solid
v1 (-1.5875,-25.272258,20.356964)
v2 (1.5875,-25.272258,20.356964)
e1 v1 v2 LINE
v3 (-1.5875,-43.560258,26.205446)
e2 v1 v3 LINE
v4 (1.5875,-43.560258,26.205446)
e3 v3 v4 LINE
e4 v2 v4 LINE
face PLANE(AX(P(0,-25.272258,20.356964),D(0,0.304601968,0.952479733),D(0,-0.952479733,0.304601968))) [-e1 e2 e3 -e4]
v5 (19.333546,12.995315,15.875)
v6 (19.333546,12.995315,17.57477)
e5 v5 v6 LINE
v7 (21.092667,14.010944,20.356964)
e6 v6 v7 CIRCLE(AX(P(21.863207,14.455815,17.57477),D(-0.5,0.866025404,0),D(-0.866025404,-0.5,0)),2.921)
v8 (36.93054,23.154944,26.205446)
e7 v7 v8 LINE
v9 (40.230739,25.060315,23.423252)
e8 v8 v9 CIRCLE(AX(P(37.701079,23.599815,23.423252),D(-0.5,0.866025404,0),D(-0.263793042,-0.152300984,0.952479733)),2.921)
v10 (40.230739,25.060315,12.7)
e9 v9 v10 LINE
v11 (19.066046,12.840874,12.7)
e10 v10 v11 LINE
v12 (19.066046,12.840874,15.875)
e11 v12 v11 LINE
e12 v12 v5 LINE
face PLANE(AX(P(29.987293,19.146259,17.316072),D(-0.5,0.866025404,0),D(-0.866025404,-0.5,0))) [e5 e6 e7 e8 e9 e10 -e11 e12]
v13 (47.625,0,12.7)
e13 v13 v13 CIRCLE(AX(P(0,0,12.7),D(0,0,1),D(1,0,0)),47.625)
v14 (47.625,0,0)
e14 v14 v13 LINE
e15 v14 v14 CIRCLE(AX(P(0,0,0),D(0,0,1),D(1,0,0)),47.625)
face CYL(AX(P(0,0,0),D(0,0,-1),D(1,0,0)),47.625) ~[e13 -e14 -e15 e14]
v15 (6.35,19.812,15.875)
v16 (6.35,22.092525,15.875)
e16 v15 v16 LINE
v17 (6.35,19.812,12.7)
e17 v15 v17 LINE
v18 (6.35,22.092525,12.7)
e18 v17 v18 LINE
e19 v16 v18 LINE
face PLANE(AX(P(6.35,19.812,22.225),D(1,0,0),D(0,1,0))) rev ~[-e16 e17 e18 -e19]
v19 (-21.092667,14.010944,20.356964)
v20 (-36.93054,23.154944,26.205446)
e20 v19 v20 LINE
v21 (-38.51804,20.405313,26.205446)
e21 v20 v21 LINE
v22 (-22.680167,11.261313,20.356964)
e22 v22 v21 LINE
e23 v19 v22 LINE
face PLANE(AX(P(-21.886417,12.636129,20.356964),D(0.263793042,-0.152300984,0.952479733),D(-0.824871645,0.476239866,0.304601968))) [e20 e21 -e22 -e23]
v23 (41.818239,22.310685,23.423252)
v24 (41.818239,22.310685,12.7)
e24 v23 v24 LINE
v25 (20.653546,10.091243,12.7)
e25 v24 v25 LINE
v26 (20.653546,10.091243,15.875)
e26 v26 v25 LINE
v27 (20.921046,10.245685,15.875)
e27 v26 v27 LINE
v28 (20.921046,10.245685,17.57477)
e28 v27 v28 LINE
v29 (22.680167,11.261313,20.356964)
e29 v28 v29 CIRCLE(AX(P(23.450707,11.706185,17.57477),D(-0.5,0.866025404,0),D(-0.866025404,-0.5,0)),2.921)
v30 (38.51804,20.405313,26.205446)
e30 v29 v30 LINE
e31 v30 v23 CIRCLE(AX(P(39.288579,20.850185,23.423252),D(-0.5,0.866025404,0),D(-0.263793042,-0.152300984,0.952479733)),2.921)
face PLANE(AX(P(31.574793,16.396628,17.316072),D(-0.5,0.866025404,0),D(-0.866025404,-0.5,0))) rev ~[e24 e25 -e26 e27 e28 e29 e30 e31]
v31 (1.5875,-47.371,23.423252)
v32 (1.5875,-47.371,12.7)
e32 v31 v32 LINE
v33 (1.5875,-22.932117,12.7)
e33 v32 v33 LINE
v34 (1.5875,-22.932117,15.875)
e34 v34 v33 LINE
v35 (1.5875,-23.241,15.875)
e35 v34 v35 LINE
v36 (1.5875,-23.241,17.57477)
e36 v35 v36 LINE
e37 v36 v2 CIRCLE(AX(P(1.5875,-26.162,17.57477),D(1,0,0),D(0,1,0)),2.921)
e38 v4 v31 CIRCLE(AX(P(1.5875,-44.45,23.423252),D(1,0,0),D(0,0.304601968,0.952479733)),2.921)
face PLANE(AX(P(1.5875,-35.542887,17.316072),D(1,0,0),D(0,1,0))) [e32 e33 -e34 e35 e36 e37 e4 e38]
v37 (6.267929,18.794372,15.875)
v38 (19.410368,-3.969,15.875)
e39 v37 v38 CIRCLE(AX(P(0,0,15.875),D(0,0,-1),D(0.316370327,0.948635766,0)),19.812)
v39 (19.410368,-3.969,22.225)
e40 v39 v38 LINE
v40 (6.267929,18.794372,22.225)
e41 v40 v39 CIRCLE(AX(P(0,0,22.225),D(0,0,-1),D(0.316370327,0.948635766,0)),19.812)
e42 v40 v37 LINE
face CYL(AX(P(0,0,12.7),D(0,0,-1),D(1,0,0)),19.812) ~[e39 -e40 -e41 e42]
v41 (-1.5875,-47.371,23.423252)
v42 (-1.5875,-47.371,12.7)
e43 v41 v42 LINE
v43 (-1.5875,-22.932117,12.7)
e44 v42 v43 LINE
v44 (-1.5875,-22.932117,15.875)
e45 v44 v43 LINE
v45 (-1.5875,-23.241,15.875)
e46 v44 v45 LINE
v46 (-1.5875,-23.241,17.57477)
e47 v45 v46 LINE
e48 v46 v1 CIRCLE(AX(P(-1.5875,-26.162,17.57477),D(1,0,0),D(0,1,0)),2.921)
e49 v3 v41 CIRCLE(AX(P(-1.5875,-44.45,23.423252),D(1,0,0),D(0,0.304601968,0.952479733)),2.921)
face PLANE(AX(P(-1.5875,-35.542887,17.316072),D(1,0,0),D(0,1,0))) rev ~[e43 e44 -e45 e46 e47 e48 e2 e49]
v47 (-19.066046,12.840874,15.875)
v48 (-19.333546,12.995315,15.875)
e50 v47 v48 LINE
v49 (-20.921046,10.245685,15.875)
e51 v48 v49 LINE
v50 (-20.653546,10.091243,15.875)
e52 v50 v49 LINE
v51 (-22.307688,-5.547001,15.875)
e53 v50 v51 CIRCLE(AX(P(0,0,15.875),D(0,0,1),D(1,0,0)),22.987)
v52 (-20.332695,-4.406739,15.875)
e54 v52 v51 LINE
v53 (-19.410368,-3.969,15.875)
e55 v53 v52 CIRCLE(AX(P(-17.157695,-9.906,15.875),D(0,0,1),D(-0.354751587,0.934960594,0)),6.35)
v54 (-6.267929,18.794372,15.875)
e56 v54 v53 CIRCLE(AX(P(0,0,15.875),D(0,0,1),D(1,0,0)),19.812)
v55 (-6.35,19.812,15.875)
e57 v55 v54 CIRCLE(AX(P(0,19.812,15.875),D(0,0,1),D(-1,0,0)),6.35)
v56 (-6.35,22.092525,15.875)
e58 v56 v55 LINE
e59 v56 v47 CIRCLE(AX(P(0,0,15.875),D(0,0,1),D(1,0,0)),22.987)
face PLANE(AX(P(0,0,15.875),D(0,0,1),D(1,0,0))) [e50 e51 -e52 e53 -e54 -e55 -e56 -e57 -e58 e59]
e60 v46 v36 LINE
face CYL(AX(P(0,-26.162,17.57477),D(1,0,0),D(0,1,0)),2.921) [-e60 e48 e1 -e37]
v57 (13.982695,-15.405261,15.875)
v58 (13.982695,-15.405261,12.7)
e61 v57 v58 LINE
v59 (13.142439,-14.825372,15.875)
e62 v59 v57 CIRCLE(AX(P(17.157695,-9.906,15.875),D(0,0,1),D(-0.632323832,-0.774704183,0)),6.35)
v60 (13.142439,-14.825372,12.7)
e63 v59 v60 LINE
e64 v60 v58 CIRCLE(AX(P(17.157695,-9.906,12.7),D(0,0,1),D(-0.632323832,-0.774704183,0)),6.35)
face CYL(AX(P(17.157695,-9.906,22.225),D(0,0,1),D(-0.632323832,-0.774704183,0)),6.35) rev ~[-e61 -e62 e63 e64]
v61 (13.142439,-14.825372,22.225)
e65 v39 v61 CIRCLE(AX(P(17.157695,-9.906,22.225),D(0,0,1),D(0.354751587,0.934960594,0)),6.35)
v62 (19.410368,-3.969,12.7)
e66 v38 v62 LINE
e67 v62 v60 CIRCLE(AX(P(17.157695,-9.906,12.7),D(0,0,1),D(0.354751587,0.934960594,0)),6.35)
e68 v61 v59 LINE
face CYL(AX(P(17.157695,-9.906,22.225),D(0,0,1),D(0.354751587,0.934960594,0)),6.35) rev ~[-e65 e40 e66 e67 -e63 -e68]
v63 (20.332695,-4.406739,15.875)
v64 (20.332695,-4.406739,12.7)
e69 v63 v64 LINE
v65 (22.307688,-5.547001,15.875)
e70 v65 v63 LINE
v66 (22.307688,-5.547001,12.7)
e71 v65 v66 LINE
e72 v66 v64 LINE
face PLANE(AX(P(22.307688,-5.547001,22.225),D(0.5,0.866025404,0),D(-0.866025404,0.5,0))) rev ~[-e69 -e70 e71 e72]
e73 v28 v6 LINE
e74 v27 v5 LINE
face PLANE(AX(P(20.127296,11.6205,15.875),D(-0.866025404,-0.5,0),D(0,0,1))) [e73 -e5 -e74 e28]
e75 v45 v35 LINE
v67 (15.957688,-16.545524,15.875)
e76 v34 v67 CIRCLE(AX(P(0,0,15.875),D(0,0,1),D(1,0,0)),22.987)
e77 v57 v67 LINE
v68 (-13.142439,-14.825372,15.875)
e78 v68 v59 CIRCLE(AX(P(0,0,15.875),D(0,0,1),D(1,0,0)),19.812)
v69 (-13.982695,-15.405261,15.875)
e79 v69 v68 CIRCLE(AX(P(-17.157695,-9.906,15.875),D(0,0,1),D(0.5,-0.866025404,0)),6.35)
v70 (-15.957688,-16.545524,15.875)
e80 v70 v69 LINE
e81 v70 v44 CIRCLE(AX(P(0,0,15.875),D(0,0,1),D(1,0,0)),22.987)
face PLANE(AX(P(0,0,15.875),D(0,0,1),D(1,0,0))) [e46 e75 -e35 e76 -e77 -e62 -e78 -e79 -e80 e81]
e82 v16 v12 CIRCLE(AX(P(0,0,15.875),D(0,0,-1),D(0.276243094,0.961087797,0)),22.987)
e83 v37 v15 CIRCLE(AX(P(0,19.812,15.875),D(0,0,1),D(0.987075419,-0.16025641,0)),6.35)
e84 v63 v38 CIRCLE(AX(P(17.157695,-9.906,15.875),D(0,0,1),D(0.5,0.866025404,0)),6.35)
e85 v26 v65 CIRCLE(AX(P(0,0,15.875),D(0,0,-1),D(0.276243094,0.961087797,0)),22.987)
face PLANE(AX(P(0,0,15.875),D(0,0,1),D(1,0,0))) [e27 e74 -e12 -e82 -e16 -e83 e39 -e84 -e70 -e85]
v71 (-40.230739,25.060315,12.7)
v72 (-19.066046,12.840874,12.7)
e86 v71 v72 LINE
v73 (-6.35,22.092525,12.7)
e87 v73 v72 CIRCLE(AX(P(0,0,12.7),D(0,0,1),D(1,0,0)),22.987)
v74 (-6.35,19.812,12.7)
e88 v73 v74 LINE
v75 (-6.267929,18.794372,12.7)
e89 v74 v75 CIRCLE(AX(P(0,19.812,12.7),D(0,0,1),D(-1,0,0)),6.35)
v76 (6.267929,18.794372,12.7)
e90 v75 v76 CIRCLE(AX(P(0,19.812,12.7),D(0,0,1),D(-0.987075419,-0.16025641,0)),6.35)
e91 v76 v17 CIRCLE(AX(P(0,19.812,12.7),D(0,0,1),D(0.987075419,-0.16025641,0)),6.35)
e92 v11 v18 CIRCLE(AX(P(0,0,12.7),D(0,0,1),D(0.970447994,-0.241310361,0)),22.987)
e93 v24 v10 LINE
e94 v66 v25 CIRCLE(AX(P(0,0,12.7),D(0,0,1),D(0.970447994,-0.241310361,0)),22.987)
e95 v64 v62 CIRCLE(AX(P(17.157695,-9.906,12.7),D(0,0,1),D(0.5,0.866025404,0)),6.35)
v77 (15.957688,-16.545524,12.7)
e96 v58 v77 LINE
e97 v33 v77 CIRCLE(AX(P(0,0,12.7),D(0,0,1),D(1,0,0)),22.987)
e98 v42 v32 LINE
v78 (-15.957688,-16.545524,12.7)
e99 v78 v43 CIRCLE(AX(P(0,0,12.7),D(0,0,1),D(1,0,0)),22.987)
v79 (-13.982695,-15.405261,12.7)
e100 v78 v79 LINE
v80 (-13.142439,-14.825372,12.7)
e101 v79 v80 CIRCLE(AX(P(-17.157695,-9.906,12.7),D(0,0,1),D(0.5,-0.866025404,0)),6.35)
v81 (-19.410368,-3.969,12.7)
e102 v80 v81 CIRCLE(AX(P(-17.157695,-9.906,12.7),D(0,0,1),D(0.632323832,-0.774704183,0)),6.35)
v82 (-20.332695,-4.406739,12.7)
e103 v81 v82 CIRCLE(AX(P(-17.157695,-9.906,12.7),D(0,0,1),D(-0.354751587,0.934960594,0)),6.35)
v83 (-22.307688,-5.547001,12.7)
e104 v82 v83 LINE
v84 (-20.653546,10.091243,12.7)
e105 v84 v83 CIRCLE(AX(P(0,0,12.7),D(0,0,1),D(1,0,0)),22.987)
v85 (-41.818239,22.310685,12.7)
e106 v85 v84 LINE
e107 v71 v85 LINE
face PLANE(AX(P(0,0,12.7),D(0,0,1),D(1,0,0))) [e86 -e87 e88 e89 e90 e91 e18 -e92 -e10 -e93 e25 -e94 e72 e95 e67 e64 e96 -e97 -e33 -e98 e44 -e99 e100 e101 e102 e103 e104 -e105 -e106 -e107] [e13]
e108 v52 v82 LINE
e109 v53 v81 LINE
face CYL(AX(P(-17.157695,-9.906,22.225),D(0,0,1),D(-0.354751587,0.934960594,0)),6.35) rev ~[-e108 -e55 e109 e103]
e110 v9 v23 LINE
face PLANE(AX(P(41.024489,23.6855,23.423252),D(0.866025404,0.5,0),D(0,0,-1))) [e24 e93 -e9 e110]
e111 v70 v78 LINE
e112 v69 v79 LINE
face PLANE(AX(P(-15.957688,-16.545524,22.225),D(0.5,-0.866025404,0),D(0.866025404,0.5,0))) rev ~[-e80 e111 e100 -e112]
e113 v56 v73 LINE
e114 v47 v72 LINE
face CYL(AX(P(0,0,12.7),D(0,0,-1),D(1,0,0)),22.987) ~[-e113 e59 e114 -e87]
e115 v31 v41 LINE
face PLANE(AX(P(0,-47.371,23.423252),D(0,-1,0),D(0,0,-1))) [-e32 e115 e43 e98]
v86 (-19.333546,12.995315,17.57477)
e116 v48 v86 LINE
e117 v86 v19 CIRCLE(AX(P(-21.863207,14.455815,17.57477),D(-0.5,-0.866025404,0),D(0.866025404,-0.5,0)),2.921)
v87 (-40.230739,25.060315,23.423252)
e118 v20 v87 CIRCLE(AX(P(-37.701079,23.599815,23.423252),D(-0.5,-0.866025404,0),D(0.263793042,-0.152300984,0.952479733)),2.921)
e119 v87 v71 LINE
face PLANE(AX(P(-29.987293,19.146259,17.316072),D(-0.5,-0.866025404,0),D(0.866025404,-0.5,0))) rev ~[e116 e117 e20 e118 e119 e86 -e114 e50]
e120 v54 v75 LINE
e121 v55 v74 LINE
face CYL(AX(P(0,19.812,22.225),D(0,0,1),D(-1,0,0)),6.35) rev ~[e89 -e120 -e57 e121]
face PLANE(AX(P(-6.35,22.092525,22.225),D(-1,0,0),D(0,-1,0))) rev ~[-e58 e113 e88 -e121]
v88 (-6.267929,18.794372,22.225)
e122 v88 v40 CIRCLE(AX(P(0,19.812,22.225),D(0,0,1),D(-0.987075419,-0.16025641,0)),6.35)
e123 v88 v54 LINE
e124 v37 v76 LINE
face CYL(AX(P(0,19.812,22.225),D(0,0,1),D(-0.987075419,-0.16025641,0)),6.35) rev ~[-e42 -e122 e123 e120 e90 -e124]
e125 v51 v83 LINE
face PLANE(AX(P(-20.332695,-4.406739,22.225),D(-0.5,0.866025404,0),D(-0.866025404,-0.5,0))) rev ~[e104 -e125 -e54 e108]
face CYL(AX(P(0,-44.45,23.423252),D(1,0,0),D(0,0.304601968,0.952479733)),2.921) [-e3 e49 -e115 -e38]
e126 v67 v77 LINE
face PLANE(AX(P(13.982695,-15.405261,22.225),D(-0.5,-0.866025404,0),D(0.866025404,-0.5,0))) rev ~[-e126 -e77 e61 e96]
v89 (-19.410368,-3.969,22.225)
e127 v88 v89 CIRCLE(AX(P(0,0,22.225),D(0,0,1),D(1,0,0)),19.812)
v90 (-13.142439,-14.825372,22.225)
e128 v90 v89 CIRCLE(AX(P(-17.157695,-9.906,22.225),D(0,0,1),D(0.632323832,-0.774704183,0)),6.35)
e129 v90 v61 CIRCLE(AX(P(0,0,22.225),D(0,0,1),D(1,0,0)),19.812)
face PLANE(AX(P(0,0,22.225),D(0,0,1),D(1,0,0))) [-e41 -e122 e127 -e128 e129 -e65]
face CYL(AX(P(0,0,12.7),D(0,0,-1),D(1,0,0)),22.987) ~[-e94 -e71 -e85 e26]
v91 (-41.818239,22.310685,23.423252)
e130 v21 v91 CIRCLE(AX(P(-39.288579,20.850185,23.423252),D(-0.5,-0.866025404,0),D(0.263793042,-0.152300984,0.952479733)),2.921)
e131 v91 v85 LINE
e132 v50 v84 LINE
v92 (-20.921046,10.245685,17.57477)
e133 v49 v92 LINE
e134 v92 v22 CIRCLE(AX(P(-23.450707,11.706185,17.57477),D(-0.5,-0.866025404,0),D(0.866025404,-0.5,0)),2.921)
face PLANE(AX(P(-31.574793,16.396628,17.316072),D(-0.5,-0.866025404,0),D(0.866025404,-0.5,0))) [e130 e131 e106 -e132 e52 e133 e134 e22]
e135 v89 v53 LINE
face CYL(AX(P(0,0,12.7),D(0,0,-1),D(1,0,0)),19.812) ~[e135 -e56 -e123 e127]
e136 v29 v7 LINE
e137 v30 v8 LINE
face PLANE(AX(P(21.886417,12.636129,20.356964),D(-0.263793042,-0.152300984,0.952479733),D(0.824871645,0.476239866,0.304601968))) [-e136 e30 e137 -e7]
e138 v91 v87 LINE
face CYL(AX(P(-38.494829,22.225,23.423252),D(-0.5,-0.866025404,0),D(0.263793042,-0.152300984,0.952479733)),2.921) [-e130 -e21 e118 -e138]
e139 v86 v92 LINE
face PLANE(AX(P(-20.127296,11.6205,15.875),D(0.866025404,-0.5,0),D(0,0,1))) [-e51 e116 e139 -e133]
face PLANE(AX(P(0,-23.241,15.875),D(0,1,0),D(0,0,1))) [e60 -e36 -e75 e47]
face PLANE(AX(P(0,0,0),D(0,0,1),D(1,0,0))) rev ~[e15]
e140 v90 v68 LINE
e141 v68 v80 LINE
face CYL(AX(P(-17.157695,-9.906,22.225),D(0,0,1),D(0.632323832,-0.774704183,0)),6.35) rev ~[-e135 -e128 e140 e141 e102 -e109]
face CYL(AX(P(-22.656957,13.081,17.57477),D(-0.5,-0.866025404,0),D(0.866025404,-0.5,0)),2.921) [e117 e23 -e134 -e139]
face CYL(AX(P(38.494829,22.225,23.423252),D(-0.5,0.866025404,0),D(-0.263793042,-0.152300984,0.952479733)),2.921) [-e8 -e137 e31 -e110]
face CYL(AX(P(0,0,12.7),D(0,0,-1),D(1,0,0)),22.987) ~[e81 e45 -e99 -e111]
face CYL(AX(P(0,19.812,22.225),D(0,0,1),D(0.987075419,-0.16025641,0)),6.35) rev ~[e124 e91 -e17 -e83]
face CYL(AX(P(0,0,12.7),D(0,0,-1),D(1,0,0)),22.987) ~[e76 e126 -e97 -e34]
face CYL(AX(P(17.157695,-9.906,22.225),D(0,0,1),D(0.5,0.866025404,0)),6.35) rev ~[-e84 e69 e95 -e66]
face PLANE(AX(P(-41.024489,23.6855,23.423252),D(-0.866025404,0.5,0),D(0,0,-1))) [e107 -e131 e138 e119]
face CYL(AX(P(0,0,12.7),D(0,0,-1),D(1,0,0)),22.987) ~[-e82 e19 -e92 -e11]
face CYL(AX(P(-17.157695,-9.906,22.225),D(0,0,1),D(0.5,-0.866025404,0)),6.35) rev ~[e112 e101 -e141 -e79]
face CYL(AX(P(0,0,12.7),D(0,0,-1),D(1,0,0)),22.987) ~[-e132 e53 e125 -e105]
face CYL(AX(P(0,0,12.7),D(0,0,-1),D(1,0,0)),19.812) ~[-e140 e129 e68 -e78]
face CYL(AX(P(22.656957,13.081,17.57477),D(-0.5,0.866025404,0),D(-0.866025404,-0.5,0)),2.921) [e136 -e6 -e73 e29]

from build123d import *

# Parameters (mm, degrees)
F0_R            = 47.625
F1_DEPTH        = 12.7
F2_R            = 19.812
F3_DEPTH        = 9.525
F4_R            = 22.987
F4_R_2          = 19.812
F5_DEPTH        = 3.175
F7_DEPTH        = 9.525
F9_DEPTH        = 1.5875
F9_COPIES_COUNT = 3


# Not quite as in the source:
# - a pattern or mirror of a feature is missing from the dataset's text; its kind, count and spacing are read off the source's solid


with BuildPart() as f1:
    # F0 (on Top) → F1 (new body)
    with BuildSketch(Plane.XY):
        Circle(F0_R)
    extrude(amount=F1_DEPTH)

    # F2 (on face) → F3 (join)
    with BuildSketch(Plane.XY.offset(12.7)):
        Circle(F2_R)
    extrude(amount=F3_DEPTH)

    # F4 (on face) → F5 (join)
    with BuildSketch(Plane.XY.offset(12.7)):
        Circle(F4_R)
        Circle(F4_R_2, mode=Mode.SUBTRACT)
    extrude(amount=F5_DEPTH)

    # F6 (on face) → F7 (cut, through all)
    with BuildSketch(Plane.XY.offset(22.225)):
        with BuildLine():
            Line((22.307688043, -5.5470012779), (20.3326952998, -4.406738686))
            ThreePointArc((20.3326952998, -4.406738686), (19.8803431182, -4.1693033149), (19.4103678781, -3.9690002312))
            ThreePointArc((19.4103678781, -3.9690002312), (17.1576952998, -9.906), (13.1424389669, -14.8253715637))
            ThreePointArc((13.1424389669, -14.8253715637), (13.5508941459, -15.1322305189), (13.9826952998, -15.405261314))
            Line((13.9826952998, -15.405261314), (15.957688043, -16.545523906))
            ThreePointArc((15.957688043, -16.545523906), (19.9073259568, -11.4935), (22.307688043, -5.5470012779))
        make_face()
        with BuildLine():
            ThreePointArc((13.1424389669, -14.8253715637), (17.1576952998, -9.906), (19.4103678781, -3.9690002312))
            ThreePointArc((19.4103678781, -3.9690002312), (11.6584339857, -6.731), (13.1424389669, -14.8253715637))
        make_face()
        with BuildLine():
            ThreePointArc((-13.9826952998, -15.405261314), (-13.5508941459, -15.1322305189), (-13.1424389669, -14.8253715637))
            ThreePointArc((-13.1424389669, -14.8253715637), (-17.1576952998, -9.906), (-19.4103678781, -3.9690002312))
            ThreePointArc((-19.4103678781, -3.9690002312), (-19.8803431182, -4.1693033149), (-20.3326952998, -4.406738686))
            Line((-20.3326952998, -4.406738686), (-22.307688043, -5.5470012779))
            ThreePointArc((-22.307688043, -5.5470012779), (-19.9073259568, -11.4935), (-15.957688043, -16.545523906))
            Line((-15.957688043, -16.545523906), (-13.9826952998, -15.405261314))
        make_face()
        with BuildLine():
            ThreePointArc((-19.4103678781, -3.9690002312), (-17.1576952998, -9.906), (-13.1424389669, -14.8253715637))
            ThreePointArc((-13.1424389669, -14.8253715637), (-11.6584339857, -6.731), (-19.4103678781, -3.9690002312))
        make_face()
        with BuildLine():
            ThreePointArc((-6.2679289112, 18.7943717949), (0, 13.462), (6.2679289112, 18.7943717949))
            ThreePointArc((6.2679289112, 18.7943717949), (0, 19.812), (-6.2679289112, 18.7943717949))
        make_face()
        with BuildLine():
            ThreePointArc((-6.2679289112, 18.7943717949), (0, 19.812), (6.2679289112, 18.7943717949))
            ThreePointArc((6.2679289112, 18.7943717949), (6.3294489723, 19.3015338338), (6.35, 19.812))
            Line((6.35, 19.812), (6.35, 22.0925251839))
            ThreePointArc((6.35, 22.0925251839), (0, 22.987), (-6.35, 22.0925251839))
            Line((-6.35, 22.0925251839), (-6.35, 19.812))
            ThreePointArc((-6.35, 19.812), (-6.3294489723, 19.3015338338), (-6.2679289112, 18.7943717949))
        make_face()
    extrude(amount=-F7_DEPTH, mode=Mode.SUBTRACT)

    # F8 (on Right) → F9 (join, symmetric)
    with BuildSketch(Plane.YZ):
        with BuildLine():
            Line((-21.5231496841, 11.5825022791), (-21.5231496841, 15.875))
            Line((-21.5231496841, 15.875), (-23.241, 15.875))
            Line((-23.241, 15.875), (-23.241, 17.5747702103))
            ThreePointArc((-23.241, 17.5747702103), (-23.8028498992, 19.2971673195), (-25.2722576527, 20.3569635098))
            Line((-25.2722576527, 20.3569635098), (-43.5602576527, 26.2054457308))
            ThreePointArc((-43.5602576527, 26.2054457308), (-46.1723971092, 25.7824025322), (-47.371, 23.4232524314))
            Line((-47.371, 23.4232524314), (-47.371, 11.5825022791))
            Line((-47.371, 11.5825022791), (-21.5231496841, 11.5825022791))
        make_face()
    f9 = extrude(amount=F9_DEPTH, both=True)

    # F9_copies: F9 ×3 about axis
    f9_copies_axis = Axis((0, 0, 0), (0, 0, 1))
    for i in range(1, F9_COPIES_COUNT):
        add(f9.rotate(f9_copies_axis, i * 360 / F9_COPIES_COUNT))


solid = f1.part
